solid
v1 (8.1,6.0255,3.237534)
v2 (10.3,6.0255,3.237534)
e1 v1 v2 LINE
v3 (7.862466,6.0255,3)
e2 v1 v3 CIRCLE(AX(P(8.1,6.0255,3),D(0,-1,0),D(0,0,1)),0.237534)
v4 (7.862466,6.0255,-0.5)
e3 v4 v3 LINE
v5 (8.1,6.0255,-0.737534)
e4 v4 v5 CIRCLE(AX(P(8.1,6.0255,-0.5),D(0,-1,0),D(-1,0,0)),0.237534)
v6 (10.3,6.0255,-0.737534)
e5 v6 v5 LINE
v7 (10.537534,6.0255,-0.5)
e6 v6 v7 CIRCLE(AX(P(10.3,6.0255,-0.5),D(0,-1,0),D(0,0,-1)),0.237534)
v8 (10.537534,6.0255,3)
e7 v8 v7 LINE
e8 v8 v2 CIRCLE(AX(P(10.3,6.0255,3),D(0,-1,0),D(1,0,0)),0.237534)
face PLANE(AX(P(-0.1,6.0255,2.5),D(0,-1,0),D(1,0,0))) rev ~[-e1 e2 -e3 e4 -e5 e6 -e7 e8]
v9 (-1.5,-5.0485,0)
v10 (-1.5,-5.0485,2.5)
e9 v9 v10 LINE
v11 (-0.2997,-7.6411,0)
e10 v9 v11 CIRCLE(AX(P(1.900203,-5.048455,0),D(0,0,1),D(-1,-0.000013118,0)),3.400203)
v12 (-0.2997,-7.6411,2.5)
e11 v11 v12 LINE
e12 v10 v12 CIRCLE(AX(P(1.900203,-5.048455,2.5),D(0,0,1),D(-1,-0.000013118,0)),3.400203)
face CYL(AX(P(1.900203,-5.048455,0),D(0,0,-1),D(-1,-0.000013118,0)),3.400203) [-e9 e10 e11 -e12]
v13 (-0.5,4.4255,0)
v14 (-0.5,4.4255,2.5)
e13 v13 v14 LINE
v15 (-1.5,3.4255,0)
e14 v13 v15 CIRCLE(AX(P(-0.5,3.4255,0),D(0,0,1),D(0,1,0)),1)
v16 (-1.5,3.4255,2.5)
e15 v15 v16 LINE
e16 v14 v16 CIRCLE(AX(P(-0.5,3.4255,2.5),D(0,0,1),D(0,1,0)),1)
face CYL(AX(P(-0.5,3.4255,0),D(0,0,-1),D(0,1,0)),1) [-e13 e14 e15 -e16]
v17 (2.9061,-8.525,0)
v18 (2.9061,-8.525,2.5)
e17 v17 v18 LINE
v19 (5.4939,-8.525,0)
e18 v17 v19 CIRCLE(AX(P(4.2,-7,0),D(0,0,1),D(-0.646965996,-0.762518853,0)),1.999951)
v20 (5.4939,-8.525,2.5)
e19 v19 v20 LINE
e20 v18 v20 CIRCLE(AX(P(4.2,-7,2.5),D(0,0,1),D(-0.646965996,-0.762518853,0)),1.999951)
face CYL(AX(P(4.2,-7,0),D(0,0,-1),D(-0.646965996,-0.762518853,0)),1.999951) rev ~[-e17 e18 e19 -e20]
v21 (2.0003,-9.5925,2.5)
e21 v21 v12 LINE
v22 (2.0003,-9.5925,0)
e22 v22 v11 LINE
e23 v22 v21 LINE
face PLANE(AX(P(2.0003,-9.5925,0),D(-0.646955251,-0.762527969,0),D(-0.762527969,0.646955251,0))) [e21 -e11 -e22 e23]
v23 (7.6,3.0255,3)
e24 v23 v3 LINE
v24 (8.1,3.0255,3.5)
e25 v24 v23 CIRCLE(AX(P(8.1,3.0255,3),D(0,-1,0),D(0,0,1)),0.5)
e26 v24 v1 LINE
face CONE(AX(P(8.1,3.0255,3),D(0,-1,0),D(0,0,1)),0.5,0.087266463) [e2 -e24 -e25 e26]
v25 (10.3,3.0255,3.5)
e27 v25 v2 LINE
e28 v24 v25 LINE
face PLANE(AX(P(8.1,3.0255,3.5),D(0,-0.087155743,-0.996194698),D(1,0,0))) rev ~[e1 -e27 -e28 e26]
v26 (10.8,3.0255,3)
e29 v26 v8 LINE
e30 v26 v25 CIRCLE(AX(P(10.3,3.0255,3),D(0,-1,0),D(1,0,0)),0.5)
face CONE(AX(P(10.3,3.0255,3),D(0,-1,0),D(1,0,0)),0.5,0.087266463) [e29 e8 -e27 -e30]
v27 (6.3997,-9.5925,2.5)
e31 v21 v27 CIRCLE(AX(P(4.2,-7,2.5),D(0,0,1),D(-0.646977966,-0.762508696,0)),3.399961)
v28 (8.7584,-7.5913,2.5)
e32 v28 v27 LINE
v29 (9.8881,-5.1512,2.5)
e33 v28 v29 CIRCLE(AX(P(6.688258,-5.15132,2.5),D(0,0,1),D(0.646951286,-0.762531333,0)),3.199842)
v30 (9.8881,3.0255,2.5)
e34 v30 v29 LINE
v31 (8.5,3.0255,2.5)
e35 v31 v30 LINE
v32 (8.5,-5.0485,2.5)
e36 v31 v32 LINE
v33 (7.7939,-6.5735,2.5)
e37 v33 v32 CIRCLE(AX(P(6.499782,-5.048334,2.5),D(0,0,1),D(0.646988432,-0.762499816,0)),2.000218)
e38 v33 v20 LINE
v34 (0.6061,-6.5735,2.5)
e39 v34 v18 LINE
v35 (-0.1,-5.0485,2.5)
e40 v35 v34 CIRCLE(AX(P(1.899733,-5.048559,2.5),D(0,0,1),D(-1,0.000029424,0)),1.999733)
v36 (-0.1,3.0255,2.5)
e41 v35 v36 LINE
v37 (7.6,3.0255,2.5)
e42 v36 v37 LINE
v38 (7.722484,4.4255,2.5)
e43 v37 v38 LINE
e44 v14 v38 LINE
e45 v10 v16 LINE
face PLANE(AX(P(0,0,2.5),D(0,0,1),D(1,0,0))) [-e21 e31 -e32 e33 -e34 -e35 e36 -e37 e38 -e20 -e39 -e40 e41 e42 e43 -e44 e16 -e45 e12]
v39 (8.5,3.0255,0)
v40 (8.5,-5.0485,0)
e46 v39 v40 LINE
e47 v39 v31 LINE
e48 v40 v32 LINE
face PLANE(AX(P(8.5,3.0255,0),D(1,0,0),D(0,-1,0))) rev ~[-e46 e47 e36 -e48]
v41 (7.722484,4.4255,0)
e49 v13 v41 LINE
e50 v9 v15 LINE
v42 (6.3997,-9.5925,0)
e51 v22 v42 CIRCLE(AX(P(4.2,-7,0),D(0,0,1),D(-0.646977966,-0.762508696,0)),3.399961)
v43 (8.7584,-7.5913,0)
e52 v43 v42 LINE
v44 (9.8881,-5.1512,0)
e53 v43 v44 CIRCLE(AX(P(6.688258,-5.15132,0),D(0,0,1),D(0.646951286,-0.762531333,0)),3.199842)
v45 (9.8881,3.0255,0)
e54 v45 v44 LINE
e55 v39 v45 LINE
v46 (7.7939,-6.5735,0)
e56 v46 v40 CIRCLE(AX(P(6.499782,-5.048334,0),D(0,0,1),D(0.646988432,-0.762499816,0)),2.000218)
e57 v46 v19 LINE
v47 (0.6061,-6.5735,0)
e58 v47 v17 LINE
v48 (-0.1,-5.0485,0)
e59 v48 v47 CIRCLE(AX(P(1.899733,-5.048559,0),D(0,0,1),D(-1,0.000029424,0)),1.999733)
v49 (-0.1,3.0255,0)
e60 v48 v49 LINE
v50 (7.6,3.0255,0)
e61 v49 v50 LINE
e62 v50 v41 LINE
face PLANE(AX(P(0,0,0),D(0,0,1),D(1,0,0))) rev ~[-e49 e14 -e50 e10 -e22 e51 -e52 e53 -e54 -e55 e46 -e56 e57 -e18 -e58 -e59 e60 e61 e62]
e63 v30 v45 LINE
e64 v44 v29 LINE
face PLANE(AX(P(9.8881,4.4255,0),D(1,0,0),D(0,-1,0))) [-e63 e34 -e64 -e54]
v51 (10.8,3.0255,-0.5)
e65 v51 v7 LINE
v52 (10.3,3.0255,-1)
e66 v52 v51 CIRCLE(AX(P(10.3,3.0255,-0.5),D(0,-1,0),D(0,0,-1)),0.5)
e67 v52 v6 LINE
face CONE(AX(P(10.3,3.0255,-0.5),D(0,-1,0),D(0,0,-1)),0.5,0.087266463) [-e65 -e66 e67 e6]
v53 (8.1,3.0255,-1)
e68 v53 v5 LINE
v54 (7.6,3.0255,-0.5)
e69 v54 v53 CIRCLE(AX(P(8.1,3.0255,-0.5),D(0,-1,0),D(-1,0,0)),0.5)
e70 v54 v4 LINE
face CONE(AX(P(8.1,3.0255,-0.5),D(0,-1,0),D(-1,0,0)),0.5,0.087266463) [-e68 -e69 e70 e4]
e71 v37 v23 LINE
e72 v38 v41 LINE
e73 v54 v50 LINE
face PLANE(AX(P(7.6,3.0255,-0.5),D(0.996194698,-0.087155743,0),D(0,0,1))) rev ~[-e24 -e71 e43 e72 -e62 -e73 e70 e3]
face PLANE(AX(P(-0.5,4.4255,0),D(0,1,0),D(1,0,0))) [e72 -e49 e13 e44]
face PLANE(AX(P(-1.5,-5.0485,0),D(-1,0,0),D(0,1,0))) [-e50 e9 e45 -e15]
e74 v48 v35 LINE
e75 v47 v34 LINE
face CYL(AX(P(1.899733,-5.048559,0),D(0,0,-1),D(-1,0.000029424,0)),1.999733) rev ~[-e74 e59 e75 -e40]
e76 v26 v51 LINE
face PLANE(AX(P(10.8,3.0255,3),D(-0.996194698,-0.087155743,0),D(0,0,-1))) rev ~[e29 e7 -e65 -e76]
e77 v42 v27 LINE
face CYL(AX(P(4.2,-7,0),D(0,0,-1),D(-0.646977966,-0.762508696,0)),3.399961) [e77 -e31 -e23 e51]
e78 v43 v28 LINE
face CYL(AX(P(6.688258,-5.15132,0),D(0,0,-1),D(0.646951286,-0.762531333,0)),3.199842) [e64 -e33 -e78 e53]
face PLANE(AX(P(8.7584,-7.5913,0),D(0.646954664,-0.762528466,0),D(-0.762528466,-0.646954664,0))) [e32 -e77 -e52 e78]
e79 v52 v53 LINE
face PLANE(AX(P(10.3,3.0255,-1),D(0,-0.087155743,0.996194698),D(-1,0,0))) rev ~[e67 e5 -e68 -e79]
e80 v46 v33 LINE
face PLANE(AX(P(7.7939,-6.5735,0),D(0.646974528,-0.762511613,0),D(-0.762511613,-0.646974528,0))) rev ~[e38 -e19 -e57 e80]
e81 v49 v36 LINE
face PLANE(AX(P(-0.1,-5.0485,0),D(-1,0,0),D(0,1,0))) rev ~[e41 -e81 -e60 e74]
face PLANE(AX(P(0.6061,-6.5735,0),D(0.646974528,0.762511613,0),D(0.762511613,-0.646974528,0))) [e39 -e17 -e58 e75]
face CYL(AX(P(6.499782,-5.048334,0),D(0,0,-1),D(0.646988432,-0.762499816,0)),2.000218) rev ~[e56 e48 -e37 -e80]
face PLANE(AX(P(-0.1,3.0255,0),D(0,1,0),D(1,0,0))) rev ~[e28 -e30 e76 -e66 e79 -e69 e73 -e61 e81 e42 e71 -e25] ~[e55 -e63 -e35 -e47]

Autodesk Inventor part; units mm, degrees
ref_plane "YZ Plane" through (0, 0, 0) normal (1, 0, 0) x (0, 1, 0)
ref_plane "XZ Plane" through (0, 0, 0) normal (0, 1, 0) x (-1, 0, 0)
ref_plane "XY Plane" through (0, 0, 0) normal (0, 0, 1) x (1, 0, 0)
sketch "Sketch1" plane through (0, 0, 0) normal (0, 0, 1) x (1, 0, 0)
  line L0 (-0.1, 3.0255) -> (8.5, 3.0255)
  line L1 (8.5, 3.0255) -> (8.5, -5.0485)
  line L2 (-0.1, -5.0485) -> (-0.1, 3.0255)
  arc A0 (2.9061, -8.525) -> (5.4939, -8.525) centre (4.2, -7) ccw
  line L3 (0.6061, -6.5735) -> (2.9061, -8.525)
  line L4 (7.7939, -6.5735) -> (5.4939, -8.525)
  arc A1 (-0.1, -5.0485) -> (0.6061, -6.5735) centre (1.9, -5.0485) ccw
  arc A2 (8.7584, -7.5913) -> (9.8881, -5.1512) centre (6.6881, -5.1512) ccw
  line L5 (8.7584, -7.5913) -> (6.3997, -9.5925)
  arc A3 (2.0003, -9.5925) -> (6.3997, -9.5925) centre (4.2, -7) ccw
  line L6 (2.0003, -9.5925) -> (-0.2997, -7.6411)
  arc A4 (-1.5, -5.0485) -> (-0.2997, -7.6411) centre (1.9, -5.0485) ccw
  line L7 (-1.5, -5.0485) -> (-1.5, 3.4255)
  line L8 (-0.5, 4.4255) -> (9.8881, 4.4255)
  line L9 (9.8881, 4.4255) -> (9.8881, -5.1512)
  arc A5 (-0.5, 4.4255) -> (-1.5, 3.4255) centre (-0.5, 3.4255) ccw
  arc A6 (7.7939, -6.5735) -> (8.5, -5.0485) centre (6.5, -5.0485) ccw
  point P0 (-0.1, -5.9745)
  dimension "d1" = 9
  dimension "d2" = 4
  dimension "d4" = 2
  dimension "d5" = 1.4
  dimension "d6" = 1
  dimension "d16" = 2
  dimension "d19" = 8.6
  dimension "d20" = 2.3
extrude "Extrusion1" add sketch "Sketch1" along normal blind 2.5
sketch "Sketch2" plane through (-0.1, 3.0255, 2.5) normal (0, -1, 0) x (1, 0, 0)
  line L0 (8.2, 1) -> (10.4, 1)
  line L1 (10.9, 0.5) -> (10.9, -3)
  line L2 (10.4, -3.5) -> (8.2, -3.5)
  line L3 (7.7, -3) -> (7.7, 0.5)
  arc A0 (8.2, 1) -> (7.7, 0.5) centre (8.2, 0.5) ccw
  arc A1 (10.9, 0.5) -> (10.4, 1) centre (10.4, 0.5) ccw
  arc A2 (10.4, -3.5) -> (10.9, -3) centre (10.4, -3) ccw
  arc A3 (7.7, -3) -> (8.2, -3.5) centre (8.2, -3) ccw
  line L4 (-1.4, -2.5) -> (-1.4, 0) projected
  point P0 (7.7, 1)
  point P1 (10.9, -3.5)
  point P2 (10.9, 1)
  dimension "d9" = 4.5
  dimension "d10" = 3.2
  dimension "d13" = 0.5
  dimension "d21" = 9.1
extrude "Extrusion2" add sketch "Sketch2" against normal blind 3 draft -5
properties part number "fastener_02"
